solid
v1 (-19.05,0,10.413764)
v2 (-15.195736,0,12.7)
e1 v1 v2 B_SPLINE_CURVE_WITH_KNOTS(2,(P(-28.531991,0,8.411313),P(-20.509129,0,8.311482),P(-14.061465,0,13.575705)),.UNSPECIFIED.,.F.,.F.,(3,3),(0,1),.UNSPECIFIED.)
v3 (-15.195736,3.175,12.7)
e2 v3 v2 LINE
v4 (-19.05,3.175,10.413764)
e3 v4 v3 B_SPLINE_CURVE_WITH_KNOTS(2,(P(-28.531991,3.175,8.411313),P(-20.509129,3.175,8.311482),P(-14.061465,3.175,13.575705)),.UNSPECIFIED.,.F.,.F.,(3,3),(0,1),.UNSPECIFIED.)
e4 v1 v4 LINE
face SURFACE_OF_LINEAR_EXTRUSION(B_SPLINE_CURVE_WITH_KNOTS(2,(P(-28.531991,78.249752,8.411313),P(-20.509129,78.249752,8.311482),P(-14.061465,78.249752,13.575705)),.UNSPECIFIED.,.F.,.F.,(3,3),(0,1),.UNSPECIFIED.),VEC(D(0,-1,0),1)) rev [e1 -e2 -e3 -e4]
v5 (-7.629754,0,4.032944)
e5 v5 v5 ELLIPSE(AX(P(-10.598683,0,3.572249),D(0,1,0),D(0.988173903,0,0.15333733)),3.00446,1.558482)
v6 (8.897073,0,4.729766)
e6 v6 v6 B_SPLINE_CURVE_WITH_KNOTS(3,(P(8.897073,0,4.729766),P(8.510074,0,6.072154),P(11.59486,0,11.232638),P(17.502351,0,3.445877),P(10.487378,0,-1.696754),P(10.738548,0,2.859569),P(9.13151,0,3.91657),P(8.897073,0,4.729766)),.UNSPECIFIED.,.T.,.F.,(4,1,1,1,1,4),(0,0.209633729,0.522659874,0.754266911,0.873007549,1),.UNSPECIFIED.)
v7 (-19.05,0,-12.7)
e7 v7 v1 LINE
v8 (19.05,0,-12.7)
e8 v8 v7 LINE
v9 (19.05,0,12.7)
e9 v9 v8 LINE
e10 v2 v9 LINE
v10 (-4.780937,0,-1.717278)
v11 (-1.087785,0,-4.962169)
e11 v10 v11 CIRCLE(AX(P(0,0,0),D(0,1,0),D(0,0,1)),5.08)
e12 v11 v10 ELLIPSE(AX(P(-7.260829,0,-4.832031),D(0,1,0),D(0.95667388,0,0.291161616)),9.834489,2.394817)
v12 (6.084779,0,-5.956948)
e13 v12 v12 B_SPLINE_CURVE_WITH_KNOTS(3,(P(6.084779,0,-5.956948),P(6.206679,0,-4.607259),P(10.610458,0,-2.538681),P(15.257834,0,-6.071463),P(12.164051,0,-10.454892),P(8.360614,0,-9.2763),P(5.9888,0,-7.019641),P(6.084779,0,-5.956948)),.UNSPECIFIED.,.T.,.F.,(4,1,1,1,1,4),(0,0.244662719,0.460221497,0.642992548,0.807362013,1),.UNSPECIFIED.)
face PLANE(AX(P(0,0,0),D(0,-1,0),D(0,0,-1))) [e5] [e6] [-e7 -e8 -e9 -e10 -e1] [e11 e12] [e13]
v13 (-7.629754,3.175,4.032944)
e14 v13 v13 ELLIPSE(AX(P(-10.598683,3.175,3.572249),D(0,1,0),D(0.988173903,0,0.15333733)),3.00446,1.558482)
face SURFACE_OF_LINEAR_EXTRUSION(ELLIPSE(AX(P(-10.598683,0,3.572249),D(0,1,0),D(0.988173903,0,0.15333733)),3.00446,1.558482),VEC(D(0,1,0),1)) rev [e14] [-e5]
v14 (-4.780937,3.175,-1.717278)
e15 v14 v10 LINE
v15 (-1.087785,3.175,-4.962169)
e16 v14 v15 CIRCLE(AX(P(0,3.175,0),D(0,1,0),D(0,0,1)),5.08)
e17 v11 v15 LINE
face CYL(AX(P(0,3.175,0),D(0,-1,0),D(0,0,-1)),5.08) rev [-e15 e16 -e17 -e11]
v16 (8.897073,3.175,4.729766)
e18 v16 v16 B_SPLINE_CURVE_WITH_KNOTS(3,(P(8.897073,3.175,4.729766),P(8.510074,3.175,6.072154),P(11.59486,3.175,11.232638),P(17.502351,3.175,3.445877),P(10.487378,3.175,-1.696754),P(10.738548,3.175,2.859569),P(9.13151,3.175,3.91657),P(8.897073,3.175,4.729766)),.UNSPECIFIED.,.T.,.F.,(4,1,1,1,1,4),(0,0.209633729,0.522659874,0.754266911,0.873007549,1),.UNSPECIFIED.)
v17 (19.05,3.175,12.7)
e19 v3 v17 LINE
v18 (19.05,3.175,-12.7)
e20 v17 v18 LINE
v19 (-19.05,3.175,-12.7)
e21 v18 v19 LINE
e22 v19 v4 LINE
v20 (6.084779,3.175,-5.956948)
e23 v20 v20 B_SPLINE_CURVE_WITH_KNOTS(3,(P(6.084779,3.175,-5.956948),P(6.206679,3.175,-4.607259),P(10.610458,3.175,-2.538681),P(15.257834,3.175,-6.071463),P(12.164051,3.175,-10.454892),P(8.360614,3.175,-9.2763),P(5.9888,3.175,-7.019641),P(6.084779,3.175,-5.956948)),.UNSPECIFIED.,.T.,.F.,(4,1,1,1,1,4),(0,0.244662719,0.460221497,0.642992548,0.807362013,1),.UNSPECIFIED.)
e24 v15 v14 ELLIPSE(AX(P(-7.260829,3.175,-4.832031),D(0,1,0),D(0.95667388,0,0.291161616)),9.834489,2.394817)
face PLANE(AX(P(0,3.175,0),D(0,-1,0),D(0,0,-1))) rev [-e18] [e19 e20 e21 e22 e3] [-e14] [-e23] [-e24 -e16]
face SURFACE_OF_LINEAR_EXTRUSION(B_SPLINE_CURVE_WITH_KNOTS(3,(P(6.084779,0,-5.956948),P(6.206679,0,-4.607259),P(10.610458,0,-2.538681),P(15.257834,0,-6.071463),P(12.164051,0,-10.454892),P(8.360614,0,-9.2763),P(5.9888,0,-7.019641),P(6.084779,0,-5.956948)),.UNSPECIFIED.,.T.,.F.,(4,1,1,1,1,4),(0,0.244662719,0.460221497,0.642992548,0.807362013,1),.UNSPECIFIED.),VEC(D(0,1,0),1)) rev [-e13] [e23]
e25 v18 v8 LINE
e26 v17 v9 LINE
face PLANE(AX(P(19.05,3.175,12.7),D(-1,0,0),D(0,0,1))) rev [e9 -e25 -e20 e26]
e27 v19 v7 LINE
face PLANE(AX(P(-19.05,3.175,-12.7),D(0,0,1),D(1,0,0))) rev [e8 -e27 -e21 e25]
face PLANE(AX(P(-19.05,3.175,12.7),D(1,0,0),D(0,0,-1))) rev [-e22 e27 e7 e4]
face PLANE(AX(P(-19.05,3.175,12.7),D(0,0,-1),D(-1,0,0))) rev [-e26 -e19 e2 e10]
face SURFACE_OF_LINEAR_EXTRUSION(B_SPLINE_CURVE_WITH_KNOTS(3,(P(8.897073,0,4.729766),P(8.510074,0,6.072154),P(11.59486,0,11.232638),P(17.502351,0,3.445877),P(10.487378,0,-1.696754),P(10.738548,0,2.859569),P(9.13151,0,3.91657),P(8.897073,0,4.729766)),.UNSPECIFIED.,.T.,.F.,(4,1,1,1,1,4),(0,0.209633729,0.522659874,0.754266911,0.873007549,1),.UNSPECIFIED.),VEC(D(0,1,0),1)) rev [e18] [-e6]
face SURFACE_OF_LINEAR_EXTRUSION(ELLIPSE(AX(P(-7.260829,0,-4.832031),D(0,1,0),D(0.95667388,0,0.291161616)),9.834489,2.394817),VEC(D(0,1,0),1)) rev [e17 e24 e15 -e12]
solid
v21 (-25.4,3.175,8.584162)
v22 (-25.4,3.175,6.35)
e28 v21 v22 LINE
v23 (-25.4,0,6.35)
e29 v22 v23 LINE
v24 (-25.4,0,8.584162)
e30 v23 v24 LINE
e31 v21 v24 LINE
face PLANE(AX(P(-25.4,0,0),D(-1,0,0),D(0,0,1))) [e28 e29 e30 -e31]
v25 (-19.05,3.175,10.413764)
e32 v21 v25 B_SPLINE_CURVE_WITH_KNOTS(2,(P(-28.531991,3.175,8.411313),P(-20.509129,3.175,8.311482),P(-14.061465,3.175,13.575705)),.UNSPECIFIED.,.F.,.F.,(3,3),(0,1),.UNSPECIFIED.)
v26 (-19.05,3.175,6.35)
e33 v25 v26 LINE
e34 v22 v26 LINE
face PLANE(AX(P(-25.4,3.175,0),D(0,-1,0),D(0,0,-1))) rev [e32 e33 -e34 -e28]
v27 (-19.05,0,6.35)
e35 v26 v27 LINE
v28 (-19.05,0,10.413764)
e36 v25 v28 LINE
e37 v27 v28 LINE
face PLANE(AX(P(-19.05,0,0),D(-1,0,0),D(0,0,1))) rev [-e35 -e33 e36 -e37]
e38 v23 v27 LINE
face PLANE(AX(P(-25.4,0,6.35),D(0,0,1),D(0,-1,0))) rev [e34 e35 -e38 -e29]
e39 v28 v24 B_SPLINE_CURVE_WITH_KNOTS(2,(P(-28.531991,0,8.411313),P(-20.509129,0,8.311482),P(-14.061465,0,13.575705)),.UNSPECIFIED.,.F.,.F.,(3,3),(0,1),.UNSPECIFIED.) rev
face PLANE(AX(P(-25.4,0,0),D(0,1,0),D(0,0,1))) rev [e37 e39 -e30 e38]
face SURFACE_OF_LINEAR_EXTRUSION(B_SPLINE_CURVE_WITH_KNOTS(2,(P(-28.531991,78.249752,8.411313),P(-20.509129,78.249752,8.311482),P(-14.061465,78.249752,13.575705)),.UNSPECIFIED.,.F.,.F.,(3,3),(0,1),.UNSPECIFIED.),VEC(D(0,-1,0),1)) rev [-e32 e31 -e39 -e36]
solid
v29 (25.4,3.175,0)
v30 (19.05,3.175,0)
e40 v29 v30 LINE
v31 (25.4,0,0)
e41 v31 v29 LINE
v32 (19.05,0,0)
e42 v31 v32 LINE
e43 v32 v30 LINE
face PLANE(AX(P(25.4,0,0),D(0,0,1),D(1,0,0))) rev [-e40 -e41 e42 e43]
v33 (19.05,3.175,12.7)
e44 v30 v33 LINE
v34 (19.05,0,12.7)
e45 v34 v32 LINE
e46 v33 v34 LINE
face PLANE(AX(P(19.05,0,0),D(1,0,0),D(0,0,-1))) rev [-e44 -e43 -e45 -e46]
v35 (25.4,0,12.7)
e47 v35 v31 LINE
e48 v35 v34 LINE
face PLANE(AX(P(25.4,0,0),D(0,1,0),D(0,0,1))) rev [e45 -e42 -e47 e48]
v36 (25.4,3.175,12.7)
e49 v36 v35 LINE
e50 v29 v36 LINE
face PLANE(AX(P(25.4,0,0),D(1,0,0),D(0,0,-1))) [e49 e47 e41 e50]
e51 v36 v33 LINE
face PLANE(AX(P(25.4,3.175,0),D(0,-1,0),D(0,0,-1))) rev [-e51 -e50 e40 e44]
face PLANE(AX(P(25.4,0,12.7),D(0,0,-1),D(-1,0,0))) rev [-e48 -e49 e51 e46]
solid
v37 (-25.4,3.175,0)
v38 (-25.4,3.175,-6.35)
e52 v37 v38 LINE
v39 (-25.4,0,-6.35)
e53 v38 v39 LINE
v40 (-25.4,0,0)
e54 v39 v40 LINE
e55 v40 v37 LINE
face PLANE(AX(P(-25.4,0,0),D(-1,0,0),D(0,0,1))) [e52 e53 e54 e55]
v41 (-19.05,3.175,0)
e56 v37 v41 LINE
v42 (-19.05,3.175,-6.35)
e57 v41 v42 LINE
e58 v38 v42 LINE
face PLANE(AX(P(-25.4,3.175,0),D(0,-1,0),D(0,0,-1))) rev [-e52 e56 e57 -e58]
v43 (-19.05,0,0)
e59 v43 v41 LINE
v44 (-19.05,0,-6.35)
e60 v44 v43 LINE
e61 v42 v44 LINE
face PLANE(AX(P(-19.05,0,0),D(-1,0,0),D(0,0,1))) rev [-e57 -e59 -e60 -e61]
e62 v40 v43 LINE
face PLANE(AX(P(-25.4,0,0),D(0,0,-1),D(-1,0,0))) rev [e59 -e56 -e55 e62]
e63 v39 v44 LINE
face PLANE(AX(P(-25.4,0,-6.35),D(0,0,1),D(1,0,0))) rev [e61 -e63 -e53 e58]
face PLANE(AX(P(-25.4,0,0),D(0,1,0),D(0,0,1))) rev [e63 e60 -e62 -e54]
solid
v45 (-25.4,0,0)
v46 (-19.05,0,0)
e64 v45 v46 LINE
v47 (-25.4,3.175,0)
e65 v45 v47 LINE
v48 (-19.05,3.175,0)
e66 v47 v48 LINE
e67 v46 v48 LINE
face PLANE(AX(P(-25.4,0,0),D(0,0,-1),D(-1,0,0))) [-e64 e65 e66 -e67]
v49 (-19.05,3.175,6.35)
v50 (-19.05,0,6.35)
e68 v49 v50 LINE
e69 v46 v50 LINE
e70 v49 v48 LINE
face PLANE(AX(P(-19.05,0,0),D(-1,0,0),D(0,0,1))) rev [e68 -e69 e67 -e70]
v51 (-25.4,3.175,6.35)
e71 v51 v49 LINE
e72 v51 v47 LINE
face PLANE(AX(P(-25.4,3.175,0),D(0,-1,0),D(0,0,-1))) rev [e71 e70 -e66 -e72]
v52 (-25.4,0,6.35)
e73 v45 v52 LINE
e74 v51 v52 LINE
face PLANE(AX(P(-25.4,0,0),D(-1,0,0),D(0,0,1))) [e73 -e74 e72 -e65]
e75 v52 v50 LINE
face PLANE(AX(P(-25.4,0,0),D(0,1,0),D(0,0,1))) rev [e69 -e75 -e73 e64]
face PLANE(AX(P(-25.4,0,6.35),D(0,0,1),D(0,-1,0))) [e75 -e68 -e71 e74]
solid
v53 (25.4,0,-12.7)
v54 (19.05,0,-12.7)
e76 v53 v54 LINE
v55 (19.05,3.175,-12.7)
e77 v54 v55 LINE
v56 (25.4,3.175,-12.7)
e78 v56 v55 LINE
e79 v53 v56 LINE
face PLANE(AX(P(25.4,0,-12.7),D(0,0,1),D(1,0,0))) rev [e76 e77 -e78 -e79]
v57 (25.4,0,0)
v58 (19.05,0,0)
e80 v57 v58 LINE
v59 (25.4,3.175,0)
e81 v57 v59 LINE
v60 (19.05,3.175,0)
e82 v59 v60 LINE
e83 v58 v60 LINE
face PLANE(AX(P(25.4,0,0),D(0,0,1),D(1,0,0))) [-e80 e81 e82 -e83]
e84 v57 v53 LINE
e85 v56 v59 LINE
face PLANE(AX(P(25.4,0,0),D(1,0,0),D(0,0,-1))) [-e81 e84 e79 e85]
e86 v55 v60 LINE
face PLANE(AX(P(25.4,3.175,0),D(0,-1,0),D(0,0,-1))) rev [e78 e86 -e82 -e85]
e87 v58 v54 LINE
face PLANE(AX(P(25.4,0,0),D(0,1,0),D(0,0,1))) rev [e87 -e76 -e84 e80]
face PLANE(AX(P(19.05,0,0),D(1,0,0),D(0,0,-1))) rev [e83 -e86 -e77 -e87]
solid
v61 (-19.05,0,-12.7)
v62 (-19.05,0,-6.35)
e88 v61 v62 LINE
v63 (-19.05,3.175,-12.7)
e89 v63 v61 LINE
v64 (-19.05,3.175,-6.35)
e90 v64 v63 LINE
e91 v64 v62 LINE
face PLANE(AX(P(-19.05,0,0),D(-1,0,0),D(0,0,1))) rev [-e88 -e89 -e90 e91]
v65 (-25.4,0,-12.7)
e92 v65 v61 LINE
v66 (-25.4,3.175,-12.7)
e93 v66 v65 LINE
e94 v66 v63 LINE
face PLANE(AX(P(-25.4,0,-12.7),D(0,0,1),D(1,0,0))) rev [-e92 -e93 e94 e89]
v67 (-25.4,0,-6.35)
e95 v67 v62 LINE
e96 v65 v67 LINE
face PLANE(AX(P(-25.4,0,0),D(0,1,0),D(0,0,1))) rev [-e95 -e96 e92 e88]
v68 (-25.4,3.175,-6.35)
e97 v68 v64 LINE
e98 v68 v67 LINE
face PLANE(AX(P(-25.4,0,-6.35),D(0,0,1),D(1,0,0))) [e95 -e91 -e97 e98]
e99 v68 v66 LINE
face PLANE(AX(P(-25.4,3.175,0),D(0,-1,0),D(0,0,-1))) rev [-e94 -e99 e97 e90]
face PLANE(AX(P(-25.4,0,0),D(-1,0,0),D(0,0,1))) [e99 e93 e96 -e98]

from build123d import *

# Parameters (mm, degrees)
SKETCH1_W           = 38.1
SKETCH1_H           = 25.4
SKETCH1_R           = 5.08
BOSS_EXTRUDE1_DEPTH = 3.175
SKETCH2_W           = 6.35
SKETCH2_H           = 3.175
BOSS_EXTRUDE3_DEPTH = 6.35
SKETCH2_4_W         = 6.35
SKETCH2_4_H         = 3.175
BOSS_EXTRUDE4_DEPTH = 6.35
SKETCH2_6_W         = 6.35
SKETCH2_6_H         = 3.175
BOSS_EXTRUDE6_DEPTH = 6.35
SKETCH2_7_W         = 6.35
SKETCH2_7_H         = 3.175
BOSS_EXTRUDE7_DEPTH = 6.35
SKETCH4_W           = 12.7
SKETCH4_H           = 3.175
BOSS_EXTRUDE8_DEPTH = 6.35
SKETCH4_3_W         = 12.7
SKETCH4_3_H         = 3.175
BOSS_EXTRUDE9_DEPTH = 6.35
CUT_EXTRUDE26_START = -3.175
CUT_EXTRUDE26_DEPTH = 3.175
SKETCH20_RX         = 3.004459521
SKETCH20_RY         = 1.558481615
CUT_EXTRUDE30_DEPTH = 29.575000153
CUT_EXTRUDE31_DEPTH = 29.575000153
SKETCH21_RX         = 9.834488757
SKETCH21_RY         = 2.394817115
CUT_EXTRUDE32_DEPTH = 29.575000153
CUT_EXTRUDE33_DEPTH = 29.57500022


# Read off the part's stored shape, not the designer's step: Cut-Extrude26
with BuildPart() as part:
    # Sketch1 → Boss-Extrude1 (new body)
    with BuildSketch(Plane(origin=(0, 0, 0), x_dir=(1, 0, 0), z_dir=(0, 1, 0))):
        Rectangle(SKETCH1_W, SKETCH1_H)
        with Locations(Location((0, 0, 0), (0, 0, 270))):
            Circle(SKETCH1_R, mode=Mode.SUBTRACT)
    extrude(amount=BOSS_EXTRUDE1_DEPTH)


with BuildPart() as body_2:
    # Sketch2 → Boss-Extrude3 (new body)
    with BuildSketch(Plane.ZY.offset(19.05)):
        with Locations((-9.525, 1.5875)):
            Rectangle(SKETCH2_W, SKETCH2_H)
    extrude(amount=BOSS_EXTRUDE3_DEPTH)


with BuildPart() as body_3:
    # Sketch2<4> → Boss-Extrude4 (new body)
    with BuildSketch(Plane.ZY.offset(19.05)):
        with Locations((-3.175, 1.5875)):
            Rectangle(SKETCH2_4_W, SKETCH2_4_H)
    extrude(amount=BOSS_EXTRUDE4_DEPTH)


with BuildPart() as body_4:
    # Sketch2<6> → Boss-Extrude6 (new body)
    with BuildSketch(Plane.ZY.offset(19.05)):
        with Locations((3.175, 1.5875)):
            Rectangle(SKETCH2_6_W, SKETCH2_6_H)
    extrude(amount=BOSS_EXTRUDE6_DEPTH)


with BuildPart() as body_5:
    # Sketch2<7> → Boss-Extrude7 (new body)
    with BuildSketch(Plane.ZY.offset(19.05)):
        with Locations((9.525, 1.5875)):
            Rectangle(SKETCH2_7_W, SKETCH2_7_H)
    extrude(amount=BOSS_EXTRUDE7_DEPTH)


with BuildPart() as body_6:
    # Sketch4 → Boss-Extrude8 (new body)
    with BuildSketch(Plane(origin=(19.05, 0, 0), x_dir=(0, 0, -1), z_dir=(1, 0, 0))):
        with Locations((-6.35, 1.5875)):
            Rectangle(SKETCH4_W, SKETCH4_H)
    extrude(amount=BOSS_EXTRUDE8_DEPTH)


with BuildPart() as body_7:
    # Sketch4<3> → Boss-Extrude9 (new body)
    with BuildSketch(Plane(origin=(19.05, 0, 0), x_dir=(0, 0, -1), z_dir=(1, 0, 0))):
        with Locations((6.35, 1.5875)):
            Rectangle(SKETCH4_3_W, SKETCH4_3_H)
    extrude(amount=BOSS_EXTRUDE9_DEPTH)


with BuildPart() as cut_extrude26_tool:
    # Cut-Extrude26 outline → Cut-Extrude26 (new body)
    with BuildSketch(Plane(origin=(0, 3.175, 0), x_dir=(1, 0, 0), z_dir=(0, 1, 0)).offset(CUT_EXTRUDE26_START)):
        with BuildLine():
            Line((-25.40000001, -8.584161711), (-25.4, -12.7))
            Line((-25.4, -12.7), (-15.195735819, -12.7))
            add(Edge.make_bspline(
                [(-15.195735819, -12.7), (-19.896484417, -9.275242159), (-25.40000001, -8.584161711)],
                knots=[0.629884856, 0.629884856, 0.629884856, 1.343767888, 1.343767888, 1.343767888], degree=2))
        make_face()
    extrude(amount=CUT_EXTRUDE26_DEPTH)


with BuildPart() as part_1:
    add(part.part)

    # Cut-Extrude26: cut by cut_extrude26_tool
    add(cut_extrude26_tool.part, mode=Mode.SUBTRACT)

    # Sketch20 → Cut-Extrude30 (cut, through all)
    with BuildSketch(Plane(origin=(0, 3.175, 0), x_dir=(1, 0, 0), z_dir=(0, 1, 0))):
        with Locations(Location((-10.598682853, -3.572248522), (0, 0, -8.820379552))):
            Ellipse(SKETCH20_RX, SKETCH20_RY)
    extrude(amount=-CUT_EXTRUDE30_DEPTH, mode=Mode.SUBTRACT)

    # Sketch18 → Cut-Extrude31 (cut, through all)
    with BuildSketch(Plane(origin=(0, 3.175, 0), x_dir=(1, 0, 0), z_dir=(0, 1, 0))):
        with BuildLine():
            add(Edge.make_bspline(
                [(8.89707251, -4.729765561), (9.131509688, -3.916570321), (10.738548368, -2.859569013), (10.487378328, 1.696754067), (17.502350701, -3.445877025), (11.594859569, -11.232638154), (8.510073602, -6.072153622), (8.89707251, -4.729765561)],
                knots=[0, 0, 0, 0, 0.126992451, 0.245733089, 0.477340126, 0.790366271, 1, 1, 1, 1], degree=3))
        make_face()
    extrude(amount=-CUT_EXTRUDE31_DEPTH, mode=Mode.SUBTRACT)

    # Sketch21 → Cut-Extrude32 (cut, through all)
    with BuildSketch(Plane(origin=(0, 3.175, 0), x_dir=(1, 0, 0), z_dir=(0, 1, 0))):
        with Locations(Location((-7.260829298, 4.832030762), (0, 0, 163.072486936))):
            Ellipse(SKETCH21_RX, SKETCH21_RY)
    extrude(amount=-CUT_EXTRUDE32_DEPTH, mode=Mode.SUBTRACT)

    # Sketch23 → Cut-Extrude33 (cut, through all)
    with BuildSketch(Plane(origin=(0, 3.175, 0), x_dir=(1, 0, 0), z_dir=(0, 1, 0))):
        with BuildLine():
            add(Edge.make_bspline(
                [(6.084779473, 5.956947977), (5.988800305, 7.019640943), (8.360613638, 9.276299903), (12.16405117, 10.45489234), (15.257834124, 6.071463409), (10.610458282, 2.538680826), (6.206679233, 4.607259091), (6.084779473, 5.956947977)],
                knots=[0, 0, 0, 0, 0.192637987, 0.357007452, 0.539778503, 0.755337281, 1, 1, 1, 1], degree=3))
        make_face()
    extrude(amount=-CUT_EXTRUDE33_DEPTH, mode=Mode.SUBTRACT)


with BuildPart() as body_5_1:
    add(body_5.part)

    # Cut-Extrude26: cut by cut_extrude26_tool
    add(cut_extrude26_tool.part, mode=Mode.SUBTRACT)


solid = Compound([body_2.part, body_3.part, body_4.part, body_6.part, body_7.part, part_1.part, body_5_1.part])
